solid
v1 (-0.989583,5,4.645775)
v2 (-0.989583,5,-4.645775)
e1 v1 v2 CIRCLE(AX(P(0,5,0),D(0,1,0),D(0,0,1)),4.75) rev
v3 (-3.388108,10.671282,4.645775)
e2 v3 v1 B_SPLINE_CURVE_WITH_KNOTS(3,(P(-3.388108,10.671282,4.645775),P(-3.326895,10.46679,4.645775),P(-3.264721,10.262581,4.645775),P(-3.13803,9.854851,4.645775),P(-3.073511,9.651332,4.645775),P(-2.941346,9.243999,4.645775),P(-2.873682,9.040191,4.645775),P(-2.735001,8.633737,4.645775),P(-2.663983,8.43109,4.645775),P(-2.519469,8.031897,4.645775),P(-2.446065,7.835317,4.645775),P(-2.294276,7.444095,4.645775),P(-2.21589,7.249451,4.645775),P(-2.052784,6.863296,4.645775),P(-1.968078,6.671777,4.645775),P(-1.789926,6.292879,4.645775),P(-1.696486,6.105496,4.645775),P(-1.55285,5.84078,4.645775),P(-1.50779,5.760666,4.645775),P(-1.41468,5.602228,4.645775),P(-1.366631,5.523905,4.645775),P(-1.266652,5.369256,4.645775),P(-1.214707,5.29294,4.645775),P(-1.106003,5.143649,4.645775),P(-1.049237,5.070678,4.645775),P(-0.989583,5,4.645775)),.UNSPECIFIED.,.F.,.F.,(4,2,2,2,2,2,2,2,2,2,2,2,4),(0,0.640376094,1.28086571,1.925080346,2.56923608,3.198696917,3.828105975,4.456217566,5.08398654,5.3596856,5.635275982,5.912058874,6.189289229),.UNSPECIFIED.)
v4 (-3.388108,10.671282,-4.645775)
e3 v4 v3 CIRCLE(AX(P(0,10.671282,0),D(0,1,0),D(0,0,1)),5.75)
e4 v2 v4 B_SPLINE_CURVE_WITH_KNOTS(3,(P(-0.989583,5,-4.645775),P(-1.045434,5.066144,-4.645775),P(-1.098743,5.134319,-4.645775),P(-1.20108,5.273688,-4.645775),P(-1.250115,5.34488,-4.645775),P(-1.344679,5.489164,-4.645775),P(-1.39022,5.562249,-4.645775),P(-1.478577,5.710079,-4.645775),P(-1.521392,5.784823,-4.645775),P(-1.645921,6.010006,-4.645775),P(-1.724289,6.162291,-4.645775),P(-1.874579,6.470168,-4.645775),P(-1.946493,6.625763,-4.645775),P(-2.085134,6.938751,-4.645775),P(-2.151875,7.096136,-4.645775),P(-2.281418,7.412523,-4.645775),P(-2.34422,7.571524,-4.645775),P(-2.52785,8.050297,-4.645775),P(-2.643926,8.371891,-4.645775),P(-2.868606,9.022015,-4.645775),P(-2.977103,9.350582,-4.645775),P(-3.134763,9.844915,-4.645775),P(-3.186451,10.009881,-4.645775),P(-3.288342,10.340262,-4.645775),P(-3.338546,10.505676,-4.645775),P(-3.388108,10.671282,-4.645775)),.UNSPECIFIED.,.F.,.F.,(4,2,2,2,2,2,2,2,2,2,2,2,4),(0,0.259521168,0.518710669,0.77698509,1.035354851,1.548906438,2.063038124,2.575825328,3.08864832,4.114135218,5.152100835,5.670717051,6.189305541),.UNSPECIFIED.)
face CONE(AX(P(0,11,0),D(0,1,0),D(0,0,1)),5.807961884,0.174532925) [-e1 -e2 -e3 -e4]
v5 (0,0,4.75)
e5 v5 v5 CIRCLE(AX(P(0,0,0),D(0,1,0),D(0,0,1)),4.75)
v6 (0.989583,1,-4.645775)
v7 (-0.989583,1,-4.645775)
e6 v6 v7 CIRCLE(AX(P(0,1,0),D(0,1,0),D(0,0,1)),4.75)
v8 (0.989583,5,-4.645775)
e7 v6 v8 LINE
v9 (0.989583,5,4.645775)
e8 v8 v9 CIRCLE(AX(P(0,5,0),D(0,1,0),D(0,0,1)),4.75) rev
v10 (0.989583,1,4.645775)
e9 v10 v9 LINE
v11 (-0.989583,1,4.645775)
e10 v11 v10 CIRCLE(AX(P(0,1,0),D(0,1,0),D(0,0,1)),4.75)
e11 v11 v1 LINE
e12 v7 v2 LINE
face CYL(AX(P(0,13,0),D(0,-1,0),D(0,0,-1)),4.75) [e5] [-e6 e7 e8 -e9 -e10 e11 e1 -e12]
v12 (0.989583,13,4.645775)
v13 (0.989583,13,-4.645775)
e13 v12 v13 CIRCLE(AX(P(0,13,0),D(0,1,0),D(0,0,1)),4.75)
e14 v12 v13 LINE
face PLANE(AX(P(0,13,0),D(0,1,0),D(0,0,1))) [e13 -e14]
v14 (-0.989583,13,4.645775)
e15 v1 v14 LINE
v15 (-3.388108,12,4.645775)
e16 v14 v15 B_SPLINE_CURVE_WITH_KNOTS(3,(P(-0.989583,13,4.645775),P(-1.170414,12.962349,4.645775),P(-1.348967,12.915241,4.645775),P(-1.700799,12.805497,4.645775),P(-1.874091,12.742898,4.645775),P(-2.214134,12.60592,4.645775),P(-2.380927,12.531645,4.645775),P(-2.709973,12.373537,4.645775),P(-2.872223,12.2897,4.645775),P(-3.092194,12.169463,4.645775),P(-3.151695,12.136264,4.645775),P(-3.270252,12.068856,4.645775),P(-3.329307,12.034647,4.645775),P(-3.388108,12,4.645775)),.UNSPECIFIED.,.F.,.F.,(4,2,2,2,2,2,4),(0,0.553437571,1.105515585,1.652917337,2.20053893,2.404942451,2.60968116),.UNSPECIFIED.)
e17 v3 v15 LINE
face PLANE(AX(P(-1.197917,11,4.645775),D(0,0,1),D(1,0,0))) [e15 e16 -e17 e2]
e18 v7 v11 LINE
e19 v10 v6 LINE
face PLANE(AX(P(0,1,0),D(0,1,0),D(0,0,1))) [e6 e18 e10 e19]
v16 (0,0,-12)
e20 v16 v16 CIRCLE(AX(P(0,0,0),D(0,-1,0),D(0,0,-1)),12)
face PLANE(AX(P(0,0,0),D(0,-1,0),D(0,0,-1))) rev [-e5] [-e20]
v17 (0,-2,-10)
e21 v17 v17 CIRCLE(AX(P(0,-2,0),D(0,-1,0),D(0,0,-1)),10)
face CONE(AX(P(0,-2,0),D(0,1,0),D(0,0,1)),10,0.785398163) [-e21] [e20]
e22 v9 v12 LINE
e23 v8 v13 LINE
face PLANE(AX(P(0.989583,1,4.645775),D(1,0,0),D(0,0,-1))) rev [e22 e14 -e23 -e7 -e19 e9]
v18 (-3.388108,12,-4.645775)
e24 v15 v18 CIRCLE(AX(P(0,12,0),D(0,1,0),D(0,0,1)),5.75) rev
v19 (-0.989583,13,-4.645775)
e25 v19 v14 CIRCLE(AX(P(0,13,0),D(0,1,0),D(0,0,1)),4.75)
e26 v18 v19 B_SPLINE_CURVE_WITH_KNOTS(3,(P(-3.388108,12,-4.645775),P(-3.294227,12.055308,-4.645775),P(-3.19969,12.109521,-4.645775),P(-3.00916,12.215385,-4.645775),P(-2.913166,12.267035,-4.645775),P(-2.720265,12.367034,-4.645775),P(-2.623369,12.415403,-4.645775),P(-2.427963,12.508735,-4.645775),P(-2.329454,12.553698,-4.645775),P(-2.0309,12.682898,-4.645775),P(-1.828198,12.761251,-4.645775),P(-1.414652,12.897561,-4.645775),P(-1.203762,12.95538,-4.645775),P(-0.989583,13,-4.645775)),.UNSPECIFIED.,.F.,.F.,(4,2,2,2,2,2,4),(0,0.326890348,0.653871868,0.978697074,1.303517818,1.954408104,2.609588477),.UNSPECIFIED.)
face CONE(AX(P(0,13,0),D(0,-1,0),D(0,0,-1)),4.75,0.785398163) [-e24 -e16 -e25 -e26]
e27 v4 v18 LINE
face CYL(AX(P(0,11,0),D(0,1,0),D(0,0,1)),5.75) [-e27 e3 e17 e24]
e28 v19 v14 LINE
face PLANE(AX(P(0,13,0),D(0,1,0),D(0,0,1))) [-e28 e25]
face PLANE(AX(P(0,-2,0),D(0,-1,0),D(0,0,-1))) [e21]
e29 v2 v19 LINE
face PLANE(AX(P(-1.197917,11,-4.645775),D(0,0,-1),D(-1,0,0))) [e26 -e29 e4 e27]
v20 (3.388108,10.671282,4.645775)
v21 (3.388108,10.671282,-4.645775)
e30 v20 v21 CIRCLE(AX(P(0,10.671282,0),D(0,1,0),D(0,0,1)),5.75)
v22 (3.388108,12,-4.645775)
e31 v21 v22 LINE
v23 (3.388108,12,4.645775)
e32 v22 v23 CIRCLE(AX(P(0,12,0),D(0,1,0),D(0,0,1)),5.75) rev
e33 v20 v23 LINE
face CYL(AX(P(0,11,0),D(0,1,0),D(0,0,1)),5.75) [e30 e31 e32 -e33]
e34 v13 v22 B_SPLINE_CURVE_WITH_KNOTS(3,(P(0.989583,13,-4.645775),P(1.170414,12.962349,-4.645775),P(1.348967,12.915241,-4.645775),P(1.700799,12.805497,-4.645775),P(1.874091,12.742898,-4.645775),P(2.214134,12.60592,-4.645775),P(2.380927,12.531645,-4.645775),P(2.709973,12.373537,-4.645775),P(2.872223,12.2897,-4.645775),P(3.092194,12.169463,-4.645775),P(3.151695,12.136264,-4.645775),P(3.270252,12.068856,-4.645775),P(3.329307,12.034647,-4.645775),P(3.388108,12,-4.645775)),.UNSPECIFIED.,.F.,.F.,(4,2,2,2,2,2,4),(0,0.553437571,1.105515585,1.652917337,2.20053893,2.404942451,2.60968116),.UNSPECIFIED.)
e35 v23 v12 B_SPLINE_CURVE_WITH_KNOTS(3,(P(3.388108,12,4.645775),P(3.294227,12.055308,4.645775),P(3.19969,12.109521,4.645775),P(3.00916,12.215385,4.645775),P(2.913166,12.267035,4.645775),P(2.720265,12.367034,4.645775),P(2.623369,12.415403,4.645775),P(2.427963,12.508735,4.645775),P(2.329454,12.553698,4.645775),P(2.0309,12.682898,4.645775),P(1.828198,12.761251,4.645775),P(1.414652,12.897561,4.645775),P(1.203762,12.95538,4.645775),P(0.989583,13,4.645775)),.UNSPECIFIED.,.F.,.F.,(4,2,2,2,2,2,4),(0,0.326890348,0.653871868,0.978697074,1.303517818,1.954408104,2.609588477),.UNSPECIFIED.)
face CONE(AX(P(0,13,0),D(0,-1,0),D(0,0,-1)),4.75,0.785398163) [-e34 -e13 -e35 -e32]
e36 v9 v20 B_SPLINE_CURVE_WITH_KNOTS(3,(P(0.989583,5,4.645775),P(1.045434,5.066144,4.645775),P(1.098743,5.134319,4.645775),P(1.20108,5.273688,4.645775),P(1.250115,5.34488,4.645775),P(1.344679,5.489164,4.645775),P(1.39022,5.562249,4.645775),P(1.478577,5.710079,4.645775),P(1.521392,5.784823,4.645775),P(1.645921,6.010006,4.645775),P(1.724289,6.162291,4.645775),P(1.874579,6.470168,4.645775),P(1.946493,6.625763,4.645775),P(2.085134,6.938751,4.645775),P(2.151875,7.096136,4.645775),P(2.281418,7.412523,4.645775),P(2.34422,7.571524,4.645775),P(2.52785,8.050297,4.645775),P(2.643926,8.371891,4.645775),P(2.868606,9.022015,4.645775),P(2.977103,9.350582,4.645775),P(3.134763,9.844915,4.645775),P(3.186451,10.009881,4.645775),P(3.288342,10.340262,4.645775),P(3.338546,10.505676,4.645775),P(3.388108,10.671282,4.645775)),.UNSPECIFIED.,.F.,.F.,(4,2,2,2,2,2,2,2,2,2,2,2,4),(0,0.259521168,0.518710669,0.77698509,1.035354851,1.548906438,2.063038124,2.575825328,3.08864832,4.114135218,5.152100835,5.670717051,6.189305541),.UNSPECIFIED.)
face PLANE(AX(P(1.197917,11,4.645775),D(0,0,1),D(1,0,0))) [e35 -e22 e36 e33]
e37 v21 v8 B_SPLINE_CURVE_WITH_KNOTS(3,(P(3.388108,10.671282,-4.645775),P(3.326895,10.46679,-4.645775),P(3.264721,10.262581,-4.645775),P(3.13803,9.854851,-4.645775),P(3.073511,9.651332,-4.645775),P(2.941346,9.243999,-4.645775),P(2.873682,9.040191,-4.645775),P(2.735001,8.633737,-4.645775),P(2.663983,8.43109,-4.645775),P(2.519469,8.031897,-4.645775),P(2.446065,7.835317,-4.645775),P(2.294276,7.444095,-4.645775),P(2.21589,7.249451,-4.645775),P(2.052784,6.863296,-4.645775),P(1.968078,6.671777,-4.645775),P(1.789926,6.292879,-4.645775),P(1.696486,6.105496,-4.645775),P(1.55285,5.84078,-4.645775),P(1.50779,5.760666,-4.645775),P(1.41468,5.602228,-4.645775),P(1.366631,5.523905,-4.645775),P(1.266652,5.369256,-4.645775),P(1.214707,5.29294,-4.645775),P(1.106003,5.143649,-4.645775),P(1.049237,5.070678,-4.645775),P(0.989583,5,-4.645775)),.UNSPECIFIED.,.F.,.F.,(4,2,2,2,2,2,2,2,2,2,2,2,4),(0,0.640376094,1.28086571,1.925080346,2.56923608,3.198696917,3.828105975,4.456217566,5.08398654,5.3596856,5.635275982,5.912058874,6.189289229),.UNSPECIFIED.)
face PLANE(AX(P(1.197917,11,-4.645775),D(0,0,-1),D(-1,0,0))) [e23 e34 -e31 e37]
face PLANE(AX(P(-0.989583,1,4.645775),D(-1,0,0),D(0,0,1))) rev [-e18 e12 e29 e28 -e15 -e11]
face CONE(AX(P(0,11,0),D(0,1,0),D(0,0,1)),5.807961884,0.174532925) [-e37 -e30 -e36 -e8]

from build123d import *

# Parameters (mm, degrees)
SKETCH1_R           = 4.75
BOSS_EXTRUDE1_DEPTH = 13
SKETCH2_R           = 12
BOSS_EXTRUDE2_DEPTH = 2
CHAMFER1_SIZE       = 2
CUT_EXTRUDE1_START  = -12
CUT_EXTRUDE1_DEPTH  = 12
BOSS_EXTRUDE3_DEPTH = 2
CHAMFER3_SIZE       = 6
CHAMFER3_SIZE_2     = 1.057961884
CHAMFER4_SIZE       = 1


# Some blends are built 0.0001 mm under size
with BuildPart() as part:
    # Sketch1 → Boss-Extrude1 (new body)
    with BuildSketch(Plane(origin=(0, 0, 0), x_dir=(1, 0, 0), z_dir=(0, 1, 0))):
        with Locations(Location((0, 0, 0), (0, 0, 90))):
            Circle(SKETCH1_R)
    extrude(amount=BOSS_EXTRUDE1_DEPTH)

    # Sketch2 → Boss-Extrude2 (add)
    with BuildSketch(Plane.XZ):
        with Locations(Location((0, 0, 0), (0, 0, 270))):
            Circle(SKETCH2_R)
    extrude(amount=BOSS_EXTRUDE2_DEPTH)

    # Chamfer1
    chamfer1_edges = [part.edges().sort_by_distance(p)[0] for p in [
        (0, -2, 12),
    ]]
    chamfer(chamfer1_edges, length=CHAMFER1_SIZE - 0.0001)  # a hair under: the kernel refuses the full size

    # Sketch4 → Cut-Extrude1 (cut)
    with BuildSketch(Plane(origin=(0, 13, 0), x_dir=(1, 0, 0), z_dir=(0, 1, 0)).offset(CUT_EXTRUDE1_START)):
        with BuildLine():
            Line((-0.989583333, -4.645774944), (-0.989583333, 4.645774944))
            ThreePointArc((-0.989583333, 4.645774944), (0, 4.75), (0.989583333, 4.645774944))
            Line((0.989583333, 4.645774944), (0.989583333, -4.645774944))
            ThreePointArc((0.989583333, -4.645774944), (0, -4.75), (-0.989583333, -4.645774944))
        make_face()
    extrude(amount=CUT_EXTRUDE1_DEPTH, mode=Mode.SUBTRACT)

    # Sketch5 → Boss-Extrude3 (add)
    with BuildSketch(Plane(origin=(0, 13, 0), x_dir=(1, 0, 0), z_dir=(0, 1, 0))):
        with BuildLine():
            Line((1.197916667, -4.645774944), (3.388107905, -4.645774944))
            ThreePointArc((3.388107905, -4.645774944), (5.75, 0), (3.388107905, 4.645774944))
            Line((3.388107905, 4.645774944), (1.197916667, 4.645774944))
            Line((1.197916667, 4.645774944), (0.989583333, 4.645774944))
            Line((0.989583333, 4.645774944), (0.989583333, -4.645774944))
            Line((0.989583333, -4.645774944), (1.197916667, -4.645774944))
        make_face()
        with BuildLine():
            Line((-1.197916667, -4.645774944), (-3.388107905, -4.645774944))
            ThreePointArc((-3.388107905, -4.645774944), (-5.75, 0), (-3.388107905, 4.645774944))
            Line((-3.388107905, 4.645774944), (-1.197916667, 4.645774944))
            Line((-1.197916667, 4.645774944), (-0.989583333, 4.645774944))
            Line((-0.989583333, 4.645774944), (-0.989583333, -4.645774944))
            Line((-0.989583333, -4.645774944), (-1.197916667, -4.645774944))
        make_face()
    extrude(amount=-BOSS_EXTRUDE3_DEPTH)

    # Chamfer3
    # the kernel refuses this chamfer: 6, 1.057961884 mm, written as the material it adds along each edge
    with BuildSketch(Plane(origin=(0, 11, 0), x_dir=(-0.9999950652018581, 0, -0.0031415874858794902), z_dir=(-0.0031415874858794902, 0, 0.9999950652018581))) as chamfer3_piece_1_section:
        Polygon((4.75, CHAMFER3_SIZE), (4.75 + CHAMFER3_SIZE_2, 0), (4.75, 0), align=None)
    chamfer3_piece_1 = revolve(axis=Axis((0, 11, 0), (0, -1, 0)), revolution_arc=359.64, mode=Mode.PRIVATE)
    chamfer3_piece_1 = split(chamfer3_piece_1, bisect_by=Plane(origin=(-4.007024844, 8.962519636, 4.645774944), z_dir=(0, 0, -1)), keep=Keep.TOP, mode=Mode.PRIVATE)
    chamfer3_piece_1 = split(chamfer3_piece_1, bisect_by=Plane(origin=(-4.007024844, 8.962519636, -4.645774944), z_dir=(0, 0, 1)), keep=Keep.TOP, mode=Mode.PRIVATE)
    chamfer3_piece_1 = chamfer3_piece_1 & Plane(origin=(0, 8.962519636, 0), x_dir=(0.5892361573319569, 0, 0.8079608597529149), z_dir=(0, 1, 0)) * Cylinder(5.75, 24, mode=Mode.PRIVATE)
    add(chamfer3_piece_1)
    with BuildSketch(Plane(origin=(0, 11, 0), x_dir=(0.9999950652018581, 0, 0.003141587485879146), z_dir=(0.003141587485879146, 0, -0.9999950652018581))) as chamfer3_piece_2_section:
        Polygon((4.75, CHAMFER3_SIZE), (4.75 + CHAMFER3_SIZE_2, 0), (4.75, 0), align=None)
    chamfer3_piece_2 = revolve(axis=Axis((0, 11, 0), (0, -1, 0)), revolution_arc=359.64, mode=Mode.PRIVATE)
    chamfer3_piece_2 = split(chamfer3_piece_2, bisect_by=Plane(origin=(4.007024844, 8.962519636, 4.645774944), z_dir=(0, 0, -1)), keep=Keep.TOP, mode=Mode.PRIVATE)
    chamfer3_piece_2 = split(chamfer3_piece_2, bisect_by=Plane(origin=(4.007024844, 8.962519636, -4.645774944), z_dir=(0, 0, 1)), keep=Keep.TOP, mode=Mode.PRIVATE)
    chamfer3_piece_2 = chamfer3_piece_2 & Plane(origin=(0, 8.962519636, 0), x_dir=(0.5892361573319569, 0, 0.8079608597529149), z_dir=(0, 1, 0)) * Cylinder(5.75, 24, mode=Mode.PRIVATE)
    add(chamfer3_piece_2)

    # Chamfer4
    chamfer4_edges = [part.edges().sort_by_distance(p)[0] for p in [
        (5.75, 13, 0),
        (-5.75, 13, 0),
    ]]
    chamfer(chamfer4_edges, length=CHAMFER4_SIZE)


solid = part.part
